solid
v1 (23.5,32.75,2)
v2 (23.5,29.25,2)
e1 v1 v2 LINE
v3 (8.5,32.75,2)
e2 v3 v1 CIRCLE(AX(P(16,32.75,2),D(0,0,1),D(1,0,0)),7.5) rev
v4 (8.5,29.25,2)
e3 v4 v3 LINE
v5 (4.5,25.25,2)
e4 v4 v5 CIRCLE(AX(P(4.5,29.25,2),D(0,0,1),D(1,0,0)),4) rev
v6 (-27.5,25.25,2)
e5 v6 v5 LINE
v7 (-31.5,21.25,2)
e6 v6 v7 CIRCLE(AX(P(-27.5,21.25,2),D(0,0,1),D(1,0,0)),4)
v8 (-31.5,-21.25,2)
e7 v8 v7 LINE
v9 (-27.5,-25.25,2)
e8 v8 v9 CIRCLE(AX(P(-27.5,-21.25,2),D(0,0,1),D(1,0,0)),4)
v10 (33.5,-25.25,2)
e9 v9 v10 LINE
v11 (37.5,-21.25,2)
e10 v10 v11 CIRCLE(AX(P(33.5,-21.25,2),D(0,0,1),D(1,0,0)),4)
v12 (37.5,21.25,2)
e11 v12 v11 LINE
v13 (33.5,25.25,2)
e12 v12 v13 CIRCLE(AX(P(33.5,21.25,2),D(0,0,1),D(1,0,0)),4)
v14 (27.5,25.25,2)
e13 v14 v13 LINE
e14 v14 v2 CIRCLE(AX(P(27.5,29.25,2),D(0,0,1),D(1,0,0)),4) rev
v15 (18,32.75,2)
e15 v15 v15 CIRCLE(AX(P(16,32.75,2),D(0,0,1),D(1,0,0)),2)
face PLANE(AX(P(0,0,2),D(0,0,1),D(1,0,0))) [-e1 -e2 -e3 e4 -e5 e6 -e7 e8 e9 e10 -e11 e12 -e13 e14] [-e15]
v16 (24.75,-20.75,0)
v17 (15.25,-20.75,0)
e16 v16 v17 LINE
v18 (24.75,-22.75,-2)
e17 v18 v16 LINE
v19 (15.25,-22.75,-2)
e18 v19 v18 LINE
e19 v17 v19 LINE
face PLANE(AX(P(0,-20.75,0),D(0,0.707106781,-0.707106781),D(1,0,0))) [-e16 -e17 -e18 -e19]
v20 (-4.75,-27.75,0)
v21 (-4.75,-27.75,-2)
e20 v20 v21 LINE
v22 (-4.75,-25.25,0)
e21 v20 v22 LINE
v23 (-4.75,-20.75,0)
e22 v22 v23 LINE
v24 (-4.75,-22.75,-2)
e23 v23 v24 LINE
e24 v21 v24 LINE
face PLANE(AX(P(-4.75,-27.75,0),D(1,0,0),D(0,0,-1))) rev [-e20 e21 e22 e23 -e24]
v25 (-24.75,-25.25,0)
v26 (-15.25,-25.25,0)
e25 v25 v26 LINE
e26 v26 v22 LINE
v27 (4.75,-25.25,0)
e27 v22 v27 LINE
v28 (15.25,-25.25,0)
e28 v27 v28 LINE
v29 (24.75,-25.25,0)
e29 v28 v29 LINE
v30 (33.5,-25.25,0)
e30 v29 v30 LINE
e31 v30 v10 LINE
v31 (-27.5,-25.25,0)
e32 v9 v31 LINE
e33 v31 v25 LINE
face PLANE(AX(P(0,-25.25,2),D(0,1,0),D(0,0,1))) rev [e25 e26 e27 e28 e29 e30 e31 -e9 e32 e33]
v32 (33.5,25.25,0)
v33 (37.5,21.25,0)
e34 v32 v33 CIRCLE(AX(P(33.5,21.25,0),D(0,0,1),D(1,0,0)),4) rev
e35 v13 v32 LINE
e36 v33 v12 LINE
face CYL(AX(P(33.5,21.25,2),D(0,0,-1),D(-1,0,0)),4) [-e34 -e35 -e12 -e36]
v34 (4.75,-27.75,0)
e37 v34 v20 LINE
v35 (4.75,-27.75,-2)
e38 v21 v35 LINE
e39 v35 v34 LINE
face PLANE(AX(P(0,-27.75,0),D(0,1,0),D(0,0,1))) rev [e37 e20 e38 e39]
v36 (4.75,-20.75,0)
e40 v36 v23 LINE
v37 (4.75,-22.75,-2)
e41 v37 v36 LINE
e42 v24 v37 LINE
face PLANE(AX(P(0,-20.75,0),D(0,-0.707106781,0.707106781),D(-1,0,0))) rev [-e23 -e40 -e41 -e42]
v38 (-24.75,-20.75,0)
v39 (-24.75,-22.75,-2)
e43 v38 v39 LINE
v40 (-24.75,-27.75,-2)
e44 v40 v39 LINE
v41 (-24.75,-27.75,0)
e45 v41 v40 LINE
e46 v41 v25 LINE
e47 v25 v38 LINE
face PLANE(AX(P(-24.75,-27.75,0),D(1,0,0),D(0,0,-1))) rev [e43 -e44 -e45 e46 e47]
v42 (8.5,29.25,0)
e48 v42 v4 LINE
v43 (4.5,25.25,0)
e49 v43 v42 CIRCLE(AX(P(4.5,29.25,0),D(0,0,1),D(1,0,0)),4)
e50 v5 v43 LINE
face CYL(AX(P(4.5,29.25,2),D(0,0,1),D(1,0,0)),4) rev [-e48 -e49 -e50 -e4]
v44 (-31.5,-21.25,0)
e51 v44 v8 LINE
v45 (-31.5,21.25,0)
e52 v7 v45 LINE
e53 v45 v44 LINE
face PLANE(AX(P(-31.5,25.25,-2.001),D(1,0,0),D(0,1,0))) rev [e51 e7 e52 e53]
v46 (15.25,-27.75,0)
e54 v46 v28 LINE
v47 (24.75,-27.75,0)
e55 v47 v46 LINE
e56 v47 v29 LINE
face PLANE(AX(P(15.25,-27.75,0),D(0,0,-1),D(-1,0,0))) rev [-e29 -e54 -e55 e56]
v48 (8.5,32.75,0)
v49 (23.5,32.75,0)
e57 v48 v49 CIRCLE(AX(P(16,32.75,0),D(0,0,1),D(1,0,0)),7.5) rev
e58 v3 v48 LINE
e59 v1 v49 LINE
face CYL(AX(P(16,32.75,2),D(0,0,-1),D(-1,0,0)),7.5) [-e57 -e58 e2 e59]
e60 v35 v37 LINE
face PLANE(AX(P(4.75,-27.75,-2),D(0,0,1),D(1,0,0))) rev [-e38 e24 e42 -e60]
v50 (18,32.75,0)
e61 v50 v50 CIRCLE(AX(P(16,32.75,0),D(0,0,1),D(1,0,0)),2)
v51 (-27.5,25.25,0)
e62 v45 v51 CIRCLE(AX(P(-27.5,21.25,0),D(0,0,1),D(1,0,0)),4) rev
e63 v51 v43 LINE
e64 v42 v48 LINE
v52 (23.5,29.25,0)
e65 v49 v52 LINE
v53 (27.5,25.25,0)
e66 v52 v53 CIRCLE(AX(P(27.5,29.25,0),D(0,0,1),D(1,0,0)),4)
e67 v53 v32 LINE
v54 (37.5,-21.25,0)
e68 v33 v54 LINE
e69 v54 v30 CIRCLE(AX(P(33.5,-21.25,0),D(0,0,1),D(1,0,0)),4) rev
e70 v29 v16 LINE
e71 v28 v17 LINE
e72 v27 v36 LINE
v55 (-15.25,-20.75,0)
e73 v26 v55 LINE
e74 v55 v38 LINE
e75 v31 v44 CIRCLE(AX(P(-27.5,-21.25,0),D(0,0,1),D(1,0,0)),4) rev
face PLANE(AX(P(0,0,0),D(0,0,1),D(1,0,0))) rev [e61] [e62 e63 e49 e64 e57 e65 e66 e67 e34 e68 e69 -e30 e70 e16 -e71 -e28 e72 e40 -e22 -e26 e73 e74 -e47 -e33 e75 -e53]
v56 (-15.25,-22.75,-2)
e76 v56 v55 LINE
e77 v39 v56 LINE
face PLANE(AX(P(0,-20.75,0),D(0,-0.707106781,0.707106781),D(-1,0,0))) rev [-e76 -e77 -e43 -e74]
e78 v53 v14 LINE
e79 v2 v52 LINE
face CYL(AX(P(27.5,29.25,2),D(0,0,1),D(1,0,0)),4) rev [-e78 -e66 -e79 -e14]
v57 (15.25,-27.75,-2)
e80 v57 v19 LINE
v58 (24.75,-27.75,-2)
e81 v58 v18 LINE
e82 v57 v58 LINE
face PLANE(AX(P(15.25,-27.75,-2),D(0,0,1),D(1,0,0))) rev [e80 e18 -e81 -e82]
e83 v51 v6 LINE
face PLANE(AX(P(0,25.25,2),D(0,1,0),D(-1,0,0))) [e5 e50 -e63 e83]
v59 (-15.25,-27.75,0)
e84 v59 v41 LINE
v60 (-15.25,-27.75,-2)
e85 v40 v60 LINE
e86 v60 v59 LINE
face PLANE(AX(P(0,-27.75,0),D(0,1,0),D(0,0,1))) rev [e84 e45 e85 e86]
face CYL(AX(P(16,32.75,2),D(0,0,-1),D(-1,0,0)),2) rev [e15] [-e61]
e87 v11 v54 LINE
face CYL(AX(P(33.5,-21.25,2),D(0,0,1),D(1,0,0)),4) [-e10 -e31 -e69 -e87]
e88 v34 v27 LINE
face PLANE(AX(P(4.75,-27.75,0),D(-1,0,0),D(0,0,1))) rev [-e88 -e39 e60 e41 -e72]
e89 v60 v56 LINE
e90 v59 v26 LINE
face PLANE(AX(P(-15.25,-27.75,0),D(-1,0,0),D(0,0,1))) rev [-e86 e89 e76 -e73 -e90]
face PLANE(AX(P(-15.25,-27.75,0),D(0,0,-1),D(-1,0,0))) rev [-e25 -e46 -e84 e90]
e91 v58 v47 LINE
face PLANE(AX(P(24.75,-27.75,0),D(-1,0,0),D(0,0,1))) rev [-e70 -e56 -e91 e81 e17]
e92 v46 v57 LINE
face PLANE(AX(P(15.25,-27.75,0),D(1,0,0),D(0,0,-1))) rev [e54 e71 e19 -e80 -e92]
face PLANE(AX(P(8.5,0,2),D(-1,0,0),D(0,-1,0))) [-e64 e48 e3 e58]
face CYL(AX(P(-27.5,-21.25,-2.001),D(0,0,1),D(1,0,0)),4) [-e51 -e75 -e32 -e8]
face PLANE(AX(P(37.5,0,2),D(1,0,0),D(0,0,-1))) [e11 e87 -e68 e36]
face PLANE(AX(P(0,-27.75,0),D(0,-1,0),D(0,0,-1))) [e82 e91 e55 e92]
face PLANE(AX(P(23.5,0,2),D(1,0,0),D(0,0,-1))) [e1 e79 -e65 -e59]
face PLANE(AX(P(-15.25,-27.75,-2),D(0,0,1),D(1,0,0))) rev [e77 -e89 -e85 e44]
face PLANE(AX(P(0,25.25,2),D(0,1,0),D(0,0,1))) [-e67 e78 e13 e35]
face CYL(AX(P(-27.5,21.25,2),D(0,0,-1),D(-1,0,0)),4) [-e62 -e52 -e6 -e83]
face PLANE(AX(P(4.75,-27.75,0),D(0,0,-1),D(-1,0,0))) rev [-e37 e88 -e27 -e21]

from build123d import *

# Parameters (mm, degrees)
ESQUISSE1_R             = 2
BOSS_EXTRU_1_DEPTH      = 2
ESQUISSE2_W             = 9.5
ESQUISSE2_H             = 2
BOSS_EXTRU_2_DEPTH      = 2.5
CHANFREIN1_SIZE         = 2
ENL_V_MAT_EXTRU_2_REACH = 57.157
ESQUISSE4_W             = 6
ESQUISSE4_H             = 50.5
CONG_1_R                = 4


with BuildPart() as part:
    # Esquisse1 → Boss.-Extru.1 (new body)
    with BuildSketch(Plane.XY):
        with BuildLine():
            ThreePointArc((8.5, 32.75), (16, 40.25), (23.5, 32.75))
            Line((23.5, 32.75), (23.5, 25.25))
            Line((23.5, 25.25), (37.5, 25.25))
            Line((37.5, 25.25), (37.5, -25.25))
            Line((37.5, -25.25), (-37.5, -25.25))
            Line((-37.5, -25.25), (-37.5, 25.25))
            Line((-37.5, 25.25), (8.5, 25.25))
            Line((8.5, 25.25), (8.5, 32.75))
        make_face()
        with Locations((16, 32.75)):
            Circle(ESQUISSE1_R, mode=Mode.SUBTRACT)
    extrude(amount=BOSS_EXTRU_1_DEPTH)

    # Esquisse2 → Boss.-Extru.2 (add, symmetric)
    with BuildSketch(Plane.XZ.offset(25.25)):
        with Locations((0, -1)):
            Rectangle(ESQUISSE2_W, ESQUISSE2_H)
        with Locations((-20, -1)):
            Rectangle(ESQUISSE2_W, ESQUISSE2_H)
        with Locations((20, -1)):
            Rectangle(ESQUISSE2_W, ESQUISSE2_H)
    extrude(amount=BOSS_EXTRU_2_DEPTH, both=True)

    # Chanfrein1
    chanfrein1_edges = [part.edges().sort_by_distance(p)[0] for p in [
        (-20, -22.75, 0),
        (0, -22.75, 0),
        (20, -22.75, 0),
    ]]
    chamfer(chanfrein1_edges, length=CHANFREIN1_SIZE - 0.0001)  # a hair under: the kernel refuses the full size

    # Esquisse4 → Enlèv. mat.-Extru.2 (cut, up to next)
    with BuildSketch(Plane.XY.offset(2), mode=Mode.PRIVATE) as enl_v_mat_extru_2_sk1:
        with Locations((-34.5, 0)):
            Rectangle(ESQUISSE4_W, ESQUISSE4_H)
    enl_v_mat_extru_2_tool1 = extrude(enl_v_mat_extru_2_sk1.sketch, amount=-ENL_V_MAT_EXTRU_2_REACH, mode=Mode.PRIVATE) & part.part
    add(enl_v_mat_extru_2_tool1.solids().sort_by_distance((-34.5, 0, 2))[0], mode=Mode.SUBTRACT)

    # Congé1
    cong_1_edges = [part.edges().sort_by_distance(p)[0] for p in [
        (-31.5, 25.25, 1),
        (-31.5, -25.25, 1),
        (23.5, 25.25, 1),
        (37.5, 25.25, 1),
        (37.5, -25.25, 1),
        (8.5, 25.25, 1),
    ]]
    fillet(cong_1_edges, radius=CONG_1_R)


solid = part.part
